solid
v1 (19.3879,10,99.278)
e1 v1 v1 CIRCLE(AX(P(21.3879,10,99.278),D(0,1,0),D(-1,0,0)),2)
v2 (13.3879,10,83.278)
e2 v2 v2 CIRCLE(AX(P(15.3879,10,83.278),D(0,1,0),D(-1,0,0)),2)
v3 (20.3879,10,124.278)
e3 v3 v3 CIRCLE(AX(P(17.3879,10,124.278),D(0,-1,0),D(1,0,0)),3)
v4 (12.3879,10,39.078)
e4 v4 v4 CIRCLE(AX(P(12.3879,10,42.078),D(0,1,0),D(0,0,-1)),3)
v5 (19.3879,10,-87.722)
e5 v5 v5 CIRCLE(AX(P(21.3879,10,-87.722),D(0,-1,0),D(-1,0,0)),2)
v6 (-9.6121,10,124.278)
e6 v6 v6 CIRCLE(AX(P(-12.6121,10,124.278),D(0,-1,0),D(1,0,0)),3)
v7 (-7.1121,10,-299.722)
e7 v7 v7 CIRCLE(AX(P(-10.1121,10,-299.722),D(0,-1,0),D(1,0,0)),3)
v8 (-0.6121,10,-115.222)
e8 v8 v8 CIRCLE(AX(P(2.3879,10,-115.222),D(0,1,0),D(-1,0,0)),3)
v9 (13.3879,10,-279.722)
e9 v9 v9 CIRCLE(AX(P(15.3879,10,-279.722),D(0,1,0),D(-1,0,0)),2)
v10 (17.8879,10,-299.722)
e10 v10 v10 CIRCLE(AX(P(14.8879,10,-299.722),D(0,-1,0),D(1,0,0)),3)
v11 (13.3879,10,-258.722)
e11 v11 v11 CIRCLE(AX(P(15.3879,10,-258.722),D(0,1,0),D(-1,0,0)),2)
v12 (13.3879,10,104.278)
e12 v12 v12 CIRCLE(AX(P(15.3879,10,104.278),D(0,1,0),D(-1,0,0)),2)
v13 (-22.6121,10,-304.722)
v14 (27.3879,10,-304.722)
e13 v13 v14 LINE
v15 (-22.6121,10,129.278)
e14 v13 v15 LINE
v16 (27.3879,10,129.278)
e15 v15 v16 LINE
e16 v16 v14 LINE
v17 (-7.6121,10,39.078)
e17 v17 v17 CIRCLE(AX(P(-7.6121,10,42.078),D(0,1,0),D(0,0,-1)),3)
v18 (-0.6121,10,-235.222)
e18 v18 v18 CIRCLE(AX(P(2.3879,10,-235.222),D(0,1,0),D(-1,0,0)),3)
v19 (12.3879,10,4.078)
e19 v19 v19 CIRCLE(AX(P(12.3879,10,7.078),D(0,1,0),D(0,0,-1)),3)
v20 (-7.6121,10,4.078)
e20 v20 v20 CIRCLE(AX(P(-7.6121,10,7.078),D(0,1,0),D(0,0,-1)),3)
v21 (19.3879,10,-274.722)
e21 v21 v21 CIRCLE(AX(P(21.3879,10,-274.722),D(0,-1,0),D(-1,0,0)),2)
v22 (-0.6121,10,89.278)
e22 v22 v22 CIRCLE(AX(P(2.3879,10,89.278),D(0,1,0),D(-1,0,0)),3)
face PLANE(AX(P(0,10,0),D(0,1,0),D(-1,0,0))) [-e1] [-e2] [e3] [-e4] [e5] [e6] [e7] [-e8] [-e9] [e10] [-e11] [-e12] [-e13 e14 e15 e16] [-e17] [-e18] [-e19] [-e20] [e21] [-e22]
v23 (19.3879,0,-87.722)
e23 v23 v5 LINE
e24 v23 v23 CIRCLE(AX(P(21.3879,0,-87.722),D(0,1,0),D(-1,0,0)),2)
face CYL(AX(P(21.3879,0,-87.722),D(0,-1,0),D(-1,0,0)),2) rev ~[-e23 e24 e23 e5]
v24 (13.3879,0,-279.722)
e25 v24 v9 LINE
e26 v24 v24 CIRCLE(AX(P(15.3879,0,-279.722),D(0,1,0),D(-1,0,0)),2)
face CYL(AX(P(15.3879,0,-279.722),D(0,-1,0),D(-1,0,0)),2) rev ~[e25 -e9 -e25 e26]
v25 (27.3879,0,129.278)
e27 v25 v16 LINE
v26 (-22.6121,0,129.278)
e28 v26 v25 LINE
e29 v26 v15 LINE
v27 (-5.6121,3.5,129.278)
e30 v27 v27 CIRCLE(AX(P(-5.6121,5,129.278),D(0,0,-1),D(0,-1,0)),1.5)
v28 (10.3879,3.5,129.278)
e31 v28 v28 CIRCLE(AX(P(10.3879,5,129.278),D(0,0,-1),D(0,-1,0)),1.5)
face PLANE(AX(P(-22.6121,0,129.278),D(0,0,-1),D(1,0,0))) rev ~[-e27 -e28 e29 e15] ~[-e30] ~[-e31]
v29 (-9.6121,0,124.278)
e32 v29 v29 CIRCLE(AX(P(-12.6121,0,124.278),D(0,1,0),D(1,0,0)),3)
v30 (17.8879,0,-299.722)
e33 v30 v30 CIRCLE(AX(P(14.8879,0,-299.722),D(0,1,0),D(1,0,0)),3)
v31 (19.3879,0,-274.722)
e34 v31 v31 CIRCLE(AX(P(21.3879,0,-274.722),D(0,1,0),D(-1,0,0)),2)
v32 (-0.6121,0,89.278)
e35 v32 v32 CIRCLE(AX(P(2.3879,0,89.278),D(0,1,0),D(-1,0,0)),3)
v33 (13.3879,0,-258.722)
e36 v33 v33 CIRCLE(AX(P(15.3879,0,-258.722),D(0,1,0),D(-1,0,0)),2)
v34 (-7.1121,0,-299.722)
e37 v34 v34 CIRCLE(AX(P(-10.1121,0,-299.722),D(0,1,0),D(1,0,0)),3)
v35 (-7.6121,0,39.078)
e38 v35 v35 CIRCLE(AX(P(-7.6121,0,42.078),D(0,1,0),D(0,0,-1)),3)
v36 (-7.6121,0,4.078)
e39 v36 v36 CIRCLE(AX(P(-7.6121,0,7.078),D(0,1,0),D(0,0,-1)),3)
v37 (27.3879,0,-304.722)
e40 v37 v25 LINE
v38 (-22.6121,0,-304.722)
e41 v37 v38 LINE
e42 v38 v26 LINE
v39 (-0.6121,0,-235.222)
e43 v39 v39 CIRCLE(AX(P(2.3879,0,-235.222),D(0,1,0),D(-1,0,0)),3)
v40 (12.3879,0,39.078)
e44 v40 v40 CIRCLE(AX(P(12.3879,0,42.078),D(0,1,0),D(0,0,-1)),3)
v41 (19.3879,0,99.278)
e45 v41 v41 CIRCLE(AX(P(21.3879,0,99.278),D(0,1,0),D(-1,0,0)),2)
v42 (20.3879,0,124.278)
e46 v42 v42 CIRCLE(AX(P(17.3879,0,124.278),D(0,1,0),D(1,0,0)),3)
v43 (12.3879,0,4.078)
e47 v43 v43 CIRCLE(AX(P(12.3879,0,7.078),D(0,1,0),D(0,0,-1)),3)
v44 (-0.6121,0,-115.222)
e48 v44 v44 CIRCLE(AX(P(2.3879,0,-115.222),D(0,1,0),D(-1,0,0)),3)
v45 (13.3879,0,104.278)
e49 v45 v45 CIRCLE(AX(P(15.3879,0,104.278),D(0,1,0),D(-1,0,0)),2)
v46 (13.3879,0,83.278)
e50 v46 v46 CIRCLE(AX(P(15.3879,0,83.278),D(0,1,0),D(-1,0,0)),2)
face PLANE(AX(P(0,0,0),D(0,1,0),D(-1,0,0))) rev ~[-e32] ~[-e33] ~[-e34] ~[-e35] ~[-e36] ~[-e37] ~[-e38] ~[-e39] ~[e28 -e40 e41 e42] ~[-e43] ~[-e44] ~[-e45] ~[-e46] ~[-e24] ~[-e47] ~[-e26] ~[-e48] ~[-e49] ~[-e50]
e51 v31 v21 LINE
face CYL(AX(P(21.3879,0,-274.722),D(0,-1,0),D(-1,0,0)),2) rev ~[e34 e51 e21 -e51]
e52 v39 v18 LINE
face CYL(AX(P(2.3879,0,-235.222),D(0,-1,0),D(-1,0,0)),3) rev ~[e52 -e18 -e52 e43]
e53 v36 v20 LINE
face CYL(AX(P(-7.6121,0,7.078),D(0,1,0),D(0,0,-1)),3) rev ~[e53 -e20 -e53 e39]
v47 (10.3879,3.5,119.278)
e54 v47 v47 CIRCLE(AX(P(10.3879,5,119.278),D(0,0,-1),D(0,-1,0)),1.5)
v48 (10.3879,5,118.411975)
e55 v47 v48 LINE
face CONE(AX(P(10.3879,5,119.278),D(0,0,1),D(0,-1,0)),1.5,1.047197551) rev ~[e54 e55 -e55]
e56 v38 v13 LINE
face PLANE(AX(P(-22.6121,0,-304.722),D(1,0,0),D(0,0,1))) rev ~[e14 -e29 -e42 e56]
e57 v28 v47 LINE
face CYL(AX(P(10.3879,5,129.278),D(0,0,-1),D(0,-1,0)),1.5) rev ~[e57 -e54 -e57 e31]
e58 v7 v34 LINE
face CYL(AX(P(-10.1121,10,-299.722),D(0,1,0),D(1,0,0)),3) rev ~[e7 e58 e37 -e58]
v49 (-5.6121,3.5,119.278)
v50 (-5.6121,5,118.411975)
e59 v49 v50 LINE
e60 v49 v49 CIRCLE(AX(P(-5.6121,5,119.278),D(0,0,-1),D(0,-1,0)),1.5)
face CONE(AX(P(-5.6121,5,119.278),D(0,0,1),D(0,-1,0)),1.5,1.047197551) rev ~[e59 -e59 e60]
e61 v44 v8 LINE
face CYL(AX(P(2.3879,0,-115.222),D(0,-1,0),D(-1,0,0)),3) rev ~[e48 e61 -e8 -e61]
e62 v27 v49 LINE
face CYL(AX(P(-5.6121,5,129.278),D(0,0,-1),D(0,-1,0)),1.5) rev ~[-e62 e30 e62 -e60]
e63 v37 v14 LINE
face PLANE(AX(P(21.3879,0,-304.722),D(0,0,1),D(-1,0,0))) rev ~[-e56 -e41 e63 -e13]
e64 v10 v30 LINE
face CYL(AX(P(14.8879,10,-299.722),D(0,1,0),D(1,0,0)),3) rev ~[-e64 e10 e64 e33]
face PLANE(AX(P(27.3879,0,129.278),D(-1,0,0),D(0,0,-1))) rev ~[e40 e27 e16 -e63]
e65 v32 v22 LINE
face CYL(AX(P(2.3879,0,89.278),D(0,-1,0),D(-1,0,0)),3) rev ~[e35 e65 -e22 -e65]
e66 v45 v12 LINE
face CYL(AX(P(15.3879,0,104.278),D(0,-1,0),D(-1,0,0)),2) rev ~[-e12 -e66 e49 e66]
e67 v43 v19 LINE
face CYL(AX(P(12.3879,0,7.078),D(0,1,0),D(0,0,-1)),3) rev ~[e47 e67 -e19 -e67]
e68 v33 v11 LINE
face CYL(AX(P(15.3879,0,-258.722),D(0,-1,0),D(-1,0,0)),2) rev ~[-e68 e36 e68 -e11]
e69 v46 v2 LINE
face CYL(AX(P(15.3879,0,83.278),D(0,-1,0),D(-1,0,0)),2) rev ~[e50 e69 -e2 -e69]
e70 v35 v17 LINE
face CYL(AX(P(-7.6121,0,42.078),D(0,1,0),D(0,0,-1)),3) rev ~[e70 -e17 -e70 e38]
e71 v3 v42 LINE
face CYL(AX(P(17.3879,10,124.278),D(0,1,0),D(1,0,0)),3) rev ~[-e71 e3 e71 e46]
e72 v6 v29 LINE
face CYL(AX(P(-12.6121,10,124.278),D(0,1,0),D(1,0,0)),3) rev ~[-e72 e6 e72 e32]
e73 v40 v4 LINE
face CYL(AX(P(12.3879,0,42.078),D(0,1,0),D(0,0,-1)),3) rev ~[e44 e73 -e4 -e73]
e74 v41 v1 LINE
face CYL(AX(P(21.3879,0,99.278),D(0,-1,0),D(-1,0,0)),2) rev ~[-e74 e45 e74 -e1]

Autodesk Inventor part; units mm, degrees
ref_plane "YZ Plane" through (0, 0, 0) normal (1, 0, 0) x (0, 1, 0)
ref_plane "XZ Plane" through (0, 0, 0) normal (0, 1, 0) x (-1, 0, 0)
ref_plane "XY Plane" through (0, 0, 0) normal (0, 0, 1) x (1, 0, 0)
sketch "Boceto1" plane through (0, 0, 0) normal (0, 1, 0) x (-1, 0, 0)
  line L0 (22.6121, 129.278) -> (-27.3879, 129.278)
  line L1 (-27.3879, 129.278) -> (-27.3879, -304.722)
  line L2 (-27.3879, -304.722) -> (22.6121, -304.722)
  line L3 (22.6121, -304.722) -> (22.6121, 129.278)
  circle A0 centre (-15.3879, 104.278) radius 2
  circle A1 centre (-15.3879, 83.278) radius 2
  line L4 (-27.3879, -87.722) -> (-4.9043, -87.722)
  circle A2 centre (-15.3879, -279.722) radius 2
  circle A3 centre (-15.3879, -258.722) radius 2
  line L5 (-27.3879, -304.722) -> (-21.3879, -304.722)
  line L6 (-21.3879, -304.722) -> (-21.3879, -274.722)
  circle A4 centre (-21.3879, -274.722) radius 2
  circle A5 centre (-21.3879, -87.722) radius 2
  circle A6 centre (-21.3879, 99.278) radius 2
  circle A7 centre (-2.3879, -235.222) radius 3
  circle A8 centre (-2.3879, -115.222) radius 3
  circle A9 centre (-2.3879, 89.278) radius 3
  dimension "d4" = 434
  dimension "d5" = 50
  dimension "d16" = 4
  dimension "d17" = 4
  dimension "d18" = 25
  dimension "d19" = 21
  dimension "d20" = 12
  dimension "d21" = 12
  dimension "d85" = 12
  dimension "d86" = 12
  dimension "d87" = 21
  dimension "d89" = 30
  dimension "d90" = 4
  dimension "d91" = 4
  dimension "d92" = 44
  dimension "d93" = 44
  dimension "d94" = 217
  dimension "d95" = 6
  dimension "d96" = 25
  dimension "d97" = 69.5
  dimension "d98" = 6
  dimension "d99" = 120
  dimension "d100" = 25
  dimension "d101" = 6
  dimension "d102" = 25
  dimension "d103" = 40
extrude "Extrusión1" add sketch "Boceto1" along normal blind 10
sketch "Boceto2" plane through (0, 10, 0) normal (0, 1, 0) x (1, 0, 0)
  line L0 (-22.6121, -129.278) -> (27.3879, -129.278) projected
  line L1 (-22.6121, -129.278) -> (-22.6121, -124.278)
  line L2 (-22.6121, 304.722) -> (-22.6121, -129.278) projected
  line L3 (-22.6121, -124.278) -> (27.3879, -124.278)
  line L4 (27.3879, -129.278) -> (27.3879, 304.722) projected
  line L5 (27.3879, 304.722) -> (-22.6121, 304.722) projected
  line L6 (-22.6121, 304.722) -> (-22.6121, 299.722)
  line L7 (-22.6121, 299.722) -> (27.3879, 299.722)
  line L8 (-22.6121, -124.278) -> (-12.6121, -124.278)
  line L9 (27.3879, 299.722) -> (14.8879, 299.722)
  circle A0 centre (-12.6121, -124.278) radius 3
  circle A1 centre (17.3879, -124.278) radius 3
  circle A2 centre (-10.1121, 299.722) radius 3
  circle A3 centre (14.8879, 299.722) radius 3
  dimension "d6" = 5
  dimension "d7" = 5
  dimension "d8" = 10
  dimension "d9" = 12.5
  dimension "d10" = 6
  dimension "d11" = 6
  dimension "d12" = 6
  dimension "d13" = 6
  dimension "d30" = 5
  dimension "d74" = 5
  dimension "d110" = 10
extrude "Extrusión2" cut sketch "Boceto2" against normal blind 20 contours A0 L3 | L3 A0 | A1 L3 | L3 A1 | A2 L7 | L7 A2 | A3 L7 | L7 A3
thread "Thread1" size "M4x0.7" class "6H" standard "ANSI Metric M Profile" length 40
thread "Thread2" size "M4x0.7" class "6H" standard "ANSI Metric M Profile" length 40
sketch "Boceto3" plane through (0, 0, 0) normal (0, -1, 0) x (1, 0, 0)
  line L0 (27.3879, 129.278) -> (27.3879, -304.722) projected
  line L1 (12.3879, 42.078) -> (-7.6121, 42.078)
  line L2 (-7.6121, 42.078) -> (-7.6121, 7.078)
  line L3 (-7.6121, 7.078) -> (12.3879, 7.078)
  line L4 (12.3879, 7.078) -> (12.3879, 42.078)
  circle A0 centre (12.3879, 7.078) radius 3
  circle A1 centre (-7.6121, 7.078) radius 3
  circle A2 centre (12.3879, 42.078) radius 3
  circle A3 centre (-7.6121, 42.078) radius 3
  line L5 (-22.6121, 129.278) -> (27.3879, 129.278) projected
  line L6 (-22.6121, -304.722) -> (-22.6121, 129.278) projected
  point P0 (-14161.5164, 17179.1084)
  point P1 (-14161.5164, 17617.1084)
  point P2 (-14211.5164, 17617.1084)
  point P3 (-14211.5164, 17179.1084)
  dimension "d58" = 35
  dimension "d59" = 15
  dimension "d60" = 87.2
  dimension "d61" = 15
  dimension "d62" = 20
hole "Agujero1" at (12.3879, 0, 42.078) at (-7.6121, 0, 42.078) at (12.3879, 0, 7.078) at (-7.6121, 0, 7.078) direction (0, 1, 0) diameter 6 depth 12 tip angle 118
thread "Rosca5" size "M4x0.7" class "6H" standard "ISO Metric profile" length 430
thread "Rosca6" size "M4x0.7" class "6H" standard "ISO Metric profile" length 430
thread "Rosca7" size "M6x1" class "6H" standard "ISO Metric profile" length 430
thread "Rosca8" size "M6x1" class "6H" standard "ISO Metric profile" length 430
thread "Rosca9" size "M6x1" class "6H" standard "ISO Metric profile" length 430
thread "Rosca10" size "M6x1" class "6H" standard "ISO Metric profile" length 430
thread "Rosca11" size "M4x0.7" class "6H" standard "ISO Metric profile" length 430
thread "Rosca12" size "M6x1" class "6H" standard "ISO Metric profile" length 100
thread "Rosca13" size "M6x1" class "6H" standard "ISO Metric profile" length 100
thread "Rosca14" size "M6x1" class "6H" standard "ISO Metric profile" length 100
sketch "Sketch4" plane through (-22.6121, 0, 129.278) normal (0, 0, 1) x (1, 0, 0)
  circle A0 centre (17, 5) radius 1.25
  line L0 (0, 10) -> (50, 10) projected
  circle A1 centre (33, 5) radius 1.25
  line L1 (0, 0) -> (0, 10) projected
  dimension "d111" = 2.5
  dimension "d113" = 5
  dimension "d115" = 2.5
  dimension "d116" = 5
  dimension "d117" = 16
  dimension "d118" = 17
hole "Hole2" at (-5.6121, 5, 129.278) at (10.3879, 5, 129.278) direction (0, 0, -1) diameter 3 depth 10 tip angle 120
thread "Thread15" size "M3x0.5" class "6H" standard "ISO Metric profile" length 6
thread "Thread16" size "M3x0.5" class "6H" standard "ANSI Metric M Profile" length 6
equation "\"d100\" = d96"
equation "\"d102\" = d96"
equation "\"d110\" = d8"
equation "\"d115\" = d111"
equation "\"d116\" = d113"
properties part number "Lateral" material "Aluminio 6061"
